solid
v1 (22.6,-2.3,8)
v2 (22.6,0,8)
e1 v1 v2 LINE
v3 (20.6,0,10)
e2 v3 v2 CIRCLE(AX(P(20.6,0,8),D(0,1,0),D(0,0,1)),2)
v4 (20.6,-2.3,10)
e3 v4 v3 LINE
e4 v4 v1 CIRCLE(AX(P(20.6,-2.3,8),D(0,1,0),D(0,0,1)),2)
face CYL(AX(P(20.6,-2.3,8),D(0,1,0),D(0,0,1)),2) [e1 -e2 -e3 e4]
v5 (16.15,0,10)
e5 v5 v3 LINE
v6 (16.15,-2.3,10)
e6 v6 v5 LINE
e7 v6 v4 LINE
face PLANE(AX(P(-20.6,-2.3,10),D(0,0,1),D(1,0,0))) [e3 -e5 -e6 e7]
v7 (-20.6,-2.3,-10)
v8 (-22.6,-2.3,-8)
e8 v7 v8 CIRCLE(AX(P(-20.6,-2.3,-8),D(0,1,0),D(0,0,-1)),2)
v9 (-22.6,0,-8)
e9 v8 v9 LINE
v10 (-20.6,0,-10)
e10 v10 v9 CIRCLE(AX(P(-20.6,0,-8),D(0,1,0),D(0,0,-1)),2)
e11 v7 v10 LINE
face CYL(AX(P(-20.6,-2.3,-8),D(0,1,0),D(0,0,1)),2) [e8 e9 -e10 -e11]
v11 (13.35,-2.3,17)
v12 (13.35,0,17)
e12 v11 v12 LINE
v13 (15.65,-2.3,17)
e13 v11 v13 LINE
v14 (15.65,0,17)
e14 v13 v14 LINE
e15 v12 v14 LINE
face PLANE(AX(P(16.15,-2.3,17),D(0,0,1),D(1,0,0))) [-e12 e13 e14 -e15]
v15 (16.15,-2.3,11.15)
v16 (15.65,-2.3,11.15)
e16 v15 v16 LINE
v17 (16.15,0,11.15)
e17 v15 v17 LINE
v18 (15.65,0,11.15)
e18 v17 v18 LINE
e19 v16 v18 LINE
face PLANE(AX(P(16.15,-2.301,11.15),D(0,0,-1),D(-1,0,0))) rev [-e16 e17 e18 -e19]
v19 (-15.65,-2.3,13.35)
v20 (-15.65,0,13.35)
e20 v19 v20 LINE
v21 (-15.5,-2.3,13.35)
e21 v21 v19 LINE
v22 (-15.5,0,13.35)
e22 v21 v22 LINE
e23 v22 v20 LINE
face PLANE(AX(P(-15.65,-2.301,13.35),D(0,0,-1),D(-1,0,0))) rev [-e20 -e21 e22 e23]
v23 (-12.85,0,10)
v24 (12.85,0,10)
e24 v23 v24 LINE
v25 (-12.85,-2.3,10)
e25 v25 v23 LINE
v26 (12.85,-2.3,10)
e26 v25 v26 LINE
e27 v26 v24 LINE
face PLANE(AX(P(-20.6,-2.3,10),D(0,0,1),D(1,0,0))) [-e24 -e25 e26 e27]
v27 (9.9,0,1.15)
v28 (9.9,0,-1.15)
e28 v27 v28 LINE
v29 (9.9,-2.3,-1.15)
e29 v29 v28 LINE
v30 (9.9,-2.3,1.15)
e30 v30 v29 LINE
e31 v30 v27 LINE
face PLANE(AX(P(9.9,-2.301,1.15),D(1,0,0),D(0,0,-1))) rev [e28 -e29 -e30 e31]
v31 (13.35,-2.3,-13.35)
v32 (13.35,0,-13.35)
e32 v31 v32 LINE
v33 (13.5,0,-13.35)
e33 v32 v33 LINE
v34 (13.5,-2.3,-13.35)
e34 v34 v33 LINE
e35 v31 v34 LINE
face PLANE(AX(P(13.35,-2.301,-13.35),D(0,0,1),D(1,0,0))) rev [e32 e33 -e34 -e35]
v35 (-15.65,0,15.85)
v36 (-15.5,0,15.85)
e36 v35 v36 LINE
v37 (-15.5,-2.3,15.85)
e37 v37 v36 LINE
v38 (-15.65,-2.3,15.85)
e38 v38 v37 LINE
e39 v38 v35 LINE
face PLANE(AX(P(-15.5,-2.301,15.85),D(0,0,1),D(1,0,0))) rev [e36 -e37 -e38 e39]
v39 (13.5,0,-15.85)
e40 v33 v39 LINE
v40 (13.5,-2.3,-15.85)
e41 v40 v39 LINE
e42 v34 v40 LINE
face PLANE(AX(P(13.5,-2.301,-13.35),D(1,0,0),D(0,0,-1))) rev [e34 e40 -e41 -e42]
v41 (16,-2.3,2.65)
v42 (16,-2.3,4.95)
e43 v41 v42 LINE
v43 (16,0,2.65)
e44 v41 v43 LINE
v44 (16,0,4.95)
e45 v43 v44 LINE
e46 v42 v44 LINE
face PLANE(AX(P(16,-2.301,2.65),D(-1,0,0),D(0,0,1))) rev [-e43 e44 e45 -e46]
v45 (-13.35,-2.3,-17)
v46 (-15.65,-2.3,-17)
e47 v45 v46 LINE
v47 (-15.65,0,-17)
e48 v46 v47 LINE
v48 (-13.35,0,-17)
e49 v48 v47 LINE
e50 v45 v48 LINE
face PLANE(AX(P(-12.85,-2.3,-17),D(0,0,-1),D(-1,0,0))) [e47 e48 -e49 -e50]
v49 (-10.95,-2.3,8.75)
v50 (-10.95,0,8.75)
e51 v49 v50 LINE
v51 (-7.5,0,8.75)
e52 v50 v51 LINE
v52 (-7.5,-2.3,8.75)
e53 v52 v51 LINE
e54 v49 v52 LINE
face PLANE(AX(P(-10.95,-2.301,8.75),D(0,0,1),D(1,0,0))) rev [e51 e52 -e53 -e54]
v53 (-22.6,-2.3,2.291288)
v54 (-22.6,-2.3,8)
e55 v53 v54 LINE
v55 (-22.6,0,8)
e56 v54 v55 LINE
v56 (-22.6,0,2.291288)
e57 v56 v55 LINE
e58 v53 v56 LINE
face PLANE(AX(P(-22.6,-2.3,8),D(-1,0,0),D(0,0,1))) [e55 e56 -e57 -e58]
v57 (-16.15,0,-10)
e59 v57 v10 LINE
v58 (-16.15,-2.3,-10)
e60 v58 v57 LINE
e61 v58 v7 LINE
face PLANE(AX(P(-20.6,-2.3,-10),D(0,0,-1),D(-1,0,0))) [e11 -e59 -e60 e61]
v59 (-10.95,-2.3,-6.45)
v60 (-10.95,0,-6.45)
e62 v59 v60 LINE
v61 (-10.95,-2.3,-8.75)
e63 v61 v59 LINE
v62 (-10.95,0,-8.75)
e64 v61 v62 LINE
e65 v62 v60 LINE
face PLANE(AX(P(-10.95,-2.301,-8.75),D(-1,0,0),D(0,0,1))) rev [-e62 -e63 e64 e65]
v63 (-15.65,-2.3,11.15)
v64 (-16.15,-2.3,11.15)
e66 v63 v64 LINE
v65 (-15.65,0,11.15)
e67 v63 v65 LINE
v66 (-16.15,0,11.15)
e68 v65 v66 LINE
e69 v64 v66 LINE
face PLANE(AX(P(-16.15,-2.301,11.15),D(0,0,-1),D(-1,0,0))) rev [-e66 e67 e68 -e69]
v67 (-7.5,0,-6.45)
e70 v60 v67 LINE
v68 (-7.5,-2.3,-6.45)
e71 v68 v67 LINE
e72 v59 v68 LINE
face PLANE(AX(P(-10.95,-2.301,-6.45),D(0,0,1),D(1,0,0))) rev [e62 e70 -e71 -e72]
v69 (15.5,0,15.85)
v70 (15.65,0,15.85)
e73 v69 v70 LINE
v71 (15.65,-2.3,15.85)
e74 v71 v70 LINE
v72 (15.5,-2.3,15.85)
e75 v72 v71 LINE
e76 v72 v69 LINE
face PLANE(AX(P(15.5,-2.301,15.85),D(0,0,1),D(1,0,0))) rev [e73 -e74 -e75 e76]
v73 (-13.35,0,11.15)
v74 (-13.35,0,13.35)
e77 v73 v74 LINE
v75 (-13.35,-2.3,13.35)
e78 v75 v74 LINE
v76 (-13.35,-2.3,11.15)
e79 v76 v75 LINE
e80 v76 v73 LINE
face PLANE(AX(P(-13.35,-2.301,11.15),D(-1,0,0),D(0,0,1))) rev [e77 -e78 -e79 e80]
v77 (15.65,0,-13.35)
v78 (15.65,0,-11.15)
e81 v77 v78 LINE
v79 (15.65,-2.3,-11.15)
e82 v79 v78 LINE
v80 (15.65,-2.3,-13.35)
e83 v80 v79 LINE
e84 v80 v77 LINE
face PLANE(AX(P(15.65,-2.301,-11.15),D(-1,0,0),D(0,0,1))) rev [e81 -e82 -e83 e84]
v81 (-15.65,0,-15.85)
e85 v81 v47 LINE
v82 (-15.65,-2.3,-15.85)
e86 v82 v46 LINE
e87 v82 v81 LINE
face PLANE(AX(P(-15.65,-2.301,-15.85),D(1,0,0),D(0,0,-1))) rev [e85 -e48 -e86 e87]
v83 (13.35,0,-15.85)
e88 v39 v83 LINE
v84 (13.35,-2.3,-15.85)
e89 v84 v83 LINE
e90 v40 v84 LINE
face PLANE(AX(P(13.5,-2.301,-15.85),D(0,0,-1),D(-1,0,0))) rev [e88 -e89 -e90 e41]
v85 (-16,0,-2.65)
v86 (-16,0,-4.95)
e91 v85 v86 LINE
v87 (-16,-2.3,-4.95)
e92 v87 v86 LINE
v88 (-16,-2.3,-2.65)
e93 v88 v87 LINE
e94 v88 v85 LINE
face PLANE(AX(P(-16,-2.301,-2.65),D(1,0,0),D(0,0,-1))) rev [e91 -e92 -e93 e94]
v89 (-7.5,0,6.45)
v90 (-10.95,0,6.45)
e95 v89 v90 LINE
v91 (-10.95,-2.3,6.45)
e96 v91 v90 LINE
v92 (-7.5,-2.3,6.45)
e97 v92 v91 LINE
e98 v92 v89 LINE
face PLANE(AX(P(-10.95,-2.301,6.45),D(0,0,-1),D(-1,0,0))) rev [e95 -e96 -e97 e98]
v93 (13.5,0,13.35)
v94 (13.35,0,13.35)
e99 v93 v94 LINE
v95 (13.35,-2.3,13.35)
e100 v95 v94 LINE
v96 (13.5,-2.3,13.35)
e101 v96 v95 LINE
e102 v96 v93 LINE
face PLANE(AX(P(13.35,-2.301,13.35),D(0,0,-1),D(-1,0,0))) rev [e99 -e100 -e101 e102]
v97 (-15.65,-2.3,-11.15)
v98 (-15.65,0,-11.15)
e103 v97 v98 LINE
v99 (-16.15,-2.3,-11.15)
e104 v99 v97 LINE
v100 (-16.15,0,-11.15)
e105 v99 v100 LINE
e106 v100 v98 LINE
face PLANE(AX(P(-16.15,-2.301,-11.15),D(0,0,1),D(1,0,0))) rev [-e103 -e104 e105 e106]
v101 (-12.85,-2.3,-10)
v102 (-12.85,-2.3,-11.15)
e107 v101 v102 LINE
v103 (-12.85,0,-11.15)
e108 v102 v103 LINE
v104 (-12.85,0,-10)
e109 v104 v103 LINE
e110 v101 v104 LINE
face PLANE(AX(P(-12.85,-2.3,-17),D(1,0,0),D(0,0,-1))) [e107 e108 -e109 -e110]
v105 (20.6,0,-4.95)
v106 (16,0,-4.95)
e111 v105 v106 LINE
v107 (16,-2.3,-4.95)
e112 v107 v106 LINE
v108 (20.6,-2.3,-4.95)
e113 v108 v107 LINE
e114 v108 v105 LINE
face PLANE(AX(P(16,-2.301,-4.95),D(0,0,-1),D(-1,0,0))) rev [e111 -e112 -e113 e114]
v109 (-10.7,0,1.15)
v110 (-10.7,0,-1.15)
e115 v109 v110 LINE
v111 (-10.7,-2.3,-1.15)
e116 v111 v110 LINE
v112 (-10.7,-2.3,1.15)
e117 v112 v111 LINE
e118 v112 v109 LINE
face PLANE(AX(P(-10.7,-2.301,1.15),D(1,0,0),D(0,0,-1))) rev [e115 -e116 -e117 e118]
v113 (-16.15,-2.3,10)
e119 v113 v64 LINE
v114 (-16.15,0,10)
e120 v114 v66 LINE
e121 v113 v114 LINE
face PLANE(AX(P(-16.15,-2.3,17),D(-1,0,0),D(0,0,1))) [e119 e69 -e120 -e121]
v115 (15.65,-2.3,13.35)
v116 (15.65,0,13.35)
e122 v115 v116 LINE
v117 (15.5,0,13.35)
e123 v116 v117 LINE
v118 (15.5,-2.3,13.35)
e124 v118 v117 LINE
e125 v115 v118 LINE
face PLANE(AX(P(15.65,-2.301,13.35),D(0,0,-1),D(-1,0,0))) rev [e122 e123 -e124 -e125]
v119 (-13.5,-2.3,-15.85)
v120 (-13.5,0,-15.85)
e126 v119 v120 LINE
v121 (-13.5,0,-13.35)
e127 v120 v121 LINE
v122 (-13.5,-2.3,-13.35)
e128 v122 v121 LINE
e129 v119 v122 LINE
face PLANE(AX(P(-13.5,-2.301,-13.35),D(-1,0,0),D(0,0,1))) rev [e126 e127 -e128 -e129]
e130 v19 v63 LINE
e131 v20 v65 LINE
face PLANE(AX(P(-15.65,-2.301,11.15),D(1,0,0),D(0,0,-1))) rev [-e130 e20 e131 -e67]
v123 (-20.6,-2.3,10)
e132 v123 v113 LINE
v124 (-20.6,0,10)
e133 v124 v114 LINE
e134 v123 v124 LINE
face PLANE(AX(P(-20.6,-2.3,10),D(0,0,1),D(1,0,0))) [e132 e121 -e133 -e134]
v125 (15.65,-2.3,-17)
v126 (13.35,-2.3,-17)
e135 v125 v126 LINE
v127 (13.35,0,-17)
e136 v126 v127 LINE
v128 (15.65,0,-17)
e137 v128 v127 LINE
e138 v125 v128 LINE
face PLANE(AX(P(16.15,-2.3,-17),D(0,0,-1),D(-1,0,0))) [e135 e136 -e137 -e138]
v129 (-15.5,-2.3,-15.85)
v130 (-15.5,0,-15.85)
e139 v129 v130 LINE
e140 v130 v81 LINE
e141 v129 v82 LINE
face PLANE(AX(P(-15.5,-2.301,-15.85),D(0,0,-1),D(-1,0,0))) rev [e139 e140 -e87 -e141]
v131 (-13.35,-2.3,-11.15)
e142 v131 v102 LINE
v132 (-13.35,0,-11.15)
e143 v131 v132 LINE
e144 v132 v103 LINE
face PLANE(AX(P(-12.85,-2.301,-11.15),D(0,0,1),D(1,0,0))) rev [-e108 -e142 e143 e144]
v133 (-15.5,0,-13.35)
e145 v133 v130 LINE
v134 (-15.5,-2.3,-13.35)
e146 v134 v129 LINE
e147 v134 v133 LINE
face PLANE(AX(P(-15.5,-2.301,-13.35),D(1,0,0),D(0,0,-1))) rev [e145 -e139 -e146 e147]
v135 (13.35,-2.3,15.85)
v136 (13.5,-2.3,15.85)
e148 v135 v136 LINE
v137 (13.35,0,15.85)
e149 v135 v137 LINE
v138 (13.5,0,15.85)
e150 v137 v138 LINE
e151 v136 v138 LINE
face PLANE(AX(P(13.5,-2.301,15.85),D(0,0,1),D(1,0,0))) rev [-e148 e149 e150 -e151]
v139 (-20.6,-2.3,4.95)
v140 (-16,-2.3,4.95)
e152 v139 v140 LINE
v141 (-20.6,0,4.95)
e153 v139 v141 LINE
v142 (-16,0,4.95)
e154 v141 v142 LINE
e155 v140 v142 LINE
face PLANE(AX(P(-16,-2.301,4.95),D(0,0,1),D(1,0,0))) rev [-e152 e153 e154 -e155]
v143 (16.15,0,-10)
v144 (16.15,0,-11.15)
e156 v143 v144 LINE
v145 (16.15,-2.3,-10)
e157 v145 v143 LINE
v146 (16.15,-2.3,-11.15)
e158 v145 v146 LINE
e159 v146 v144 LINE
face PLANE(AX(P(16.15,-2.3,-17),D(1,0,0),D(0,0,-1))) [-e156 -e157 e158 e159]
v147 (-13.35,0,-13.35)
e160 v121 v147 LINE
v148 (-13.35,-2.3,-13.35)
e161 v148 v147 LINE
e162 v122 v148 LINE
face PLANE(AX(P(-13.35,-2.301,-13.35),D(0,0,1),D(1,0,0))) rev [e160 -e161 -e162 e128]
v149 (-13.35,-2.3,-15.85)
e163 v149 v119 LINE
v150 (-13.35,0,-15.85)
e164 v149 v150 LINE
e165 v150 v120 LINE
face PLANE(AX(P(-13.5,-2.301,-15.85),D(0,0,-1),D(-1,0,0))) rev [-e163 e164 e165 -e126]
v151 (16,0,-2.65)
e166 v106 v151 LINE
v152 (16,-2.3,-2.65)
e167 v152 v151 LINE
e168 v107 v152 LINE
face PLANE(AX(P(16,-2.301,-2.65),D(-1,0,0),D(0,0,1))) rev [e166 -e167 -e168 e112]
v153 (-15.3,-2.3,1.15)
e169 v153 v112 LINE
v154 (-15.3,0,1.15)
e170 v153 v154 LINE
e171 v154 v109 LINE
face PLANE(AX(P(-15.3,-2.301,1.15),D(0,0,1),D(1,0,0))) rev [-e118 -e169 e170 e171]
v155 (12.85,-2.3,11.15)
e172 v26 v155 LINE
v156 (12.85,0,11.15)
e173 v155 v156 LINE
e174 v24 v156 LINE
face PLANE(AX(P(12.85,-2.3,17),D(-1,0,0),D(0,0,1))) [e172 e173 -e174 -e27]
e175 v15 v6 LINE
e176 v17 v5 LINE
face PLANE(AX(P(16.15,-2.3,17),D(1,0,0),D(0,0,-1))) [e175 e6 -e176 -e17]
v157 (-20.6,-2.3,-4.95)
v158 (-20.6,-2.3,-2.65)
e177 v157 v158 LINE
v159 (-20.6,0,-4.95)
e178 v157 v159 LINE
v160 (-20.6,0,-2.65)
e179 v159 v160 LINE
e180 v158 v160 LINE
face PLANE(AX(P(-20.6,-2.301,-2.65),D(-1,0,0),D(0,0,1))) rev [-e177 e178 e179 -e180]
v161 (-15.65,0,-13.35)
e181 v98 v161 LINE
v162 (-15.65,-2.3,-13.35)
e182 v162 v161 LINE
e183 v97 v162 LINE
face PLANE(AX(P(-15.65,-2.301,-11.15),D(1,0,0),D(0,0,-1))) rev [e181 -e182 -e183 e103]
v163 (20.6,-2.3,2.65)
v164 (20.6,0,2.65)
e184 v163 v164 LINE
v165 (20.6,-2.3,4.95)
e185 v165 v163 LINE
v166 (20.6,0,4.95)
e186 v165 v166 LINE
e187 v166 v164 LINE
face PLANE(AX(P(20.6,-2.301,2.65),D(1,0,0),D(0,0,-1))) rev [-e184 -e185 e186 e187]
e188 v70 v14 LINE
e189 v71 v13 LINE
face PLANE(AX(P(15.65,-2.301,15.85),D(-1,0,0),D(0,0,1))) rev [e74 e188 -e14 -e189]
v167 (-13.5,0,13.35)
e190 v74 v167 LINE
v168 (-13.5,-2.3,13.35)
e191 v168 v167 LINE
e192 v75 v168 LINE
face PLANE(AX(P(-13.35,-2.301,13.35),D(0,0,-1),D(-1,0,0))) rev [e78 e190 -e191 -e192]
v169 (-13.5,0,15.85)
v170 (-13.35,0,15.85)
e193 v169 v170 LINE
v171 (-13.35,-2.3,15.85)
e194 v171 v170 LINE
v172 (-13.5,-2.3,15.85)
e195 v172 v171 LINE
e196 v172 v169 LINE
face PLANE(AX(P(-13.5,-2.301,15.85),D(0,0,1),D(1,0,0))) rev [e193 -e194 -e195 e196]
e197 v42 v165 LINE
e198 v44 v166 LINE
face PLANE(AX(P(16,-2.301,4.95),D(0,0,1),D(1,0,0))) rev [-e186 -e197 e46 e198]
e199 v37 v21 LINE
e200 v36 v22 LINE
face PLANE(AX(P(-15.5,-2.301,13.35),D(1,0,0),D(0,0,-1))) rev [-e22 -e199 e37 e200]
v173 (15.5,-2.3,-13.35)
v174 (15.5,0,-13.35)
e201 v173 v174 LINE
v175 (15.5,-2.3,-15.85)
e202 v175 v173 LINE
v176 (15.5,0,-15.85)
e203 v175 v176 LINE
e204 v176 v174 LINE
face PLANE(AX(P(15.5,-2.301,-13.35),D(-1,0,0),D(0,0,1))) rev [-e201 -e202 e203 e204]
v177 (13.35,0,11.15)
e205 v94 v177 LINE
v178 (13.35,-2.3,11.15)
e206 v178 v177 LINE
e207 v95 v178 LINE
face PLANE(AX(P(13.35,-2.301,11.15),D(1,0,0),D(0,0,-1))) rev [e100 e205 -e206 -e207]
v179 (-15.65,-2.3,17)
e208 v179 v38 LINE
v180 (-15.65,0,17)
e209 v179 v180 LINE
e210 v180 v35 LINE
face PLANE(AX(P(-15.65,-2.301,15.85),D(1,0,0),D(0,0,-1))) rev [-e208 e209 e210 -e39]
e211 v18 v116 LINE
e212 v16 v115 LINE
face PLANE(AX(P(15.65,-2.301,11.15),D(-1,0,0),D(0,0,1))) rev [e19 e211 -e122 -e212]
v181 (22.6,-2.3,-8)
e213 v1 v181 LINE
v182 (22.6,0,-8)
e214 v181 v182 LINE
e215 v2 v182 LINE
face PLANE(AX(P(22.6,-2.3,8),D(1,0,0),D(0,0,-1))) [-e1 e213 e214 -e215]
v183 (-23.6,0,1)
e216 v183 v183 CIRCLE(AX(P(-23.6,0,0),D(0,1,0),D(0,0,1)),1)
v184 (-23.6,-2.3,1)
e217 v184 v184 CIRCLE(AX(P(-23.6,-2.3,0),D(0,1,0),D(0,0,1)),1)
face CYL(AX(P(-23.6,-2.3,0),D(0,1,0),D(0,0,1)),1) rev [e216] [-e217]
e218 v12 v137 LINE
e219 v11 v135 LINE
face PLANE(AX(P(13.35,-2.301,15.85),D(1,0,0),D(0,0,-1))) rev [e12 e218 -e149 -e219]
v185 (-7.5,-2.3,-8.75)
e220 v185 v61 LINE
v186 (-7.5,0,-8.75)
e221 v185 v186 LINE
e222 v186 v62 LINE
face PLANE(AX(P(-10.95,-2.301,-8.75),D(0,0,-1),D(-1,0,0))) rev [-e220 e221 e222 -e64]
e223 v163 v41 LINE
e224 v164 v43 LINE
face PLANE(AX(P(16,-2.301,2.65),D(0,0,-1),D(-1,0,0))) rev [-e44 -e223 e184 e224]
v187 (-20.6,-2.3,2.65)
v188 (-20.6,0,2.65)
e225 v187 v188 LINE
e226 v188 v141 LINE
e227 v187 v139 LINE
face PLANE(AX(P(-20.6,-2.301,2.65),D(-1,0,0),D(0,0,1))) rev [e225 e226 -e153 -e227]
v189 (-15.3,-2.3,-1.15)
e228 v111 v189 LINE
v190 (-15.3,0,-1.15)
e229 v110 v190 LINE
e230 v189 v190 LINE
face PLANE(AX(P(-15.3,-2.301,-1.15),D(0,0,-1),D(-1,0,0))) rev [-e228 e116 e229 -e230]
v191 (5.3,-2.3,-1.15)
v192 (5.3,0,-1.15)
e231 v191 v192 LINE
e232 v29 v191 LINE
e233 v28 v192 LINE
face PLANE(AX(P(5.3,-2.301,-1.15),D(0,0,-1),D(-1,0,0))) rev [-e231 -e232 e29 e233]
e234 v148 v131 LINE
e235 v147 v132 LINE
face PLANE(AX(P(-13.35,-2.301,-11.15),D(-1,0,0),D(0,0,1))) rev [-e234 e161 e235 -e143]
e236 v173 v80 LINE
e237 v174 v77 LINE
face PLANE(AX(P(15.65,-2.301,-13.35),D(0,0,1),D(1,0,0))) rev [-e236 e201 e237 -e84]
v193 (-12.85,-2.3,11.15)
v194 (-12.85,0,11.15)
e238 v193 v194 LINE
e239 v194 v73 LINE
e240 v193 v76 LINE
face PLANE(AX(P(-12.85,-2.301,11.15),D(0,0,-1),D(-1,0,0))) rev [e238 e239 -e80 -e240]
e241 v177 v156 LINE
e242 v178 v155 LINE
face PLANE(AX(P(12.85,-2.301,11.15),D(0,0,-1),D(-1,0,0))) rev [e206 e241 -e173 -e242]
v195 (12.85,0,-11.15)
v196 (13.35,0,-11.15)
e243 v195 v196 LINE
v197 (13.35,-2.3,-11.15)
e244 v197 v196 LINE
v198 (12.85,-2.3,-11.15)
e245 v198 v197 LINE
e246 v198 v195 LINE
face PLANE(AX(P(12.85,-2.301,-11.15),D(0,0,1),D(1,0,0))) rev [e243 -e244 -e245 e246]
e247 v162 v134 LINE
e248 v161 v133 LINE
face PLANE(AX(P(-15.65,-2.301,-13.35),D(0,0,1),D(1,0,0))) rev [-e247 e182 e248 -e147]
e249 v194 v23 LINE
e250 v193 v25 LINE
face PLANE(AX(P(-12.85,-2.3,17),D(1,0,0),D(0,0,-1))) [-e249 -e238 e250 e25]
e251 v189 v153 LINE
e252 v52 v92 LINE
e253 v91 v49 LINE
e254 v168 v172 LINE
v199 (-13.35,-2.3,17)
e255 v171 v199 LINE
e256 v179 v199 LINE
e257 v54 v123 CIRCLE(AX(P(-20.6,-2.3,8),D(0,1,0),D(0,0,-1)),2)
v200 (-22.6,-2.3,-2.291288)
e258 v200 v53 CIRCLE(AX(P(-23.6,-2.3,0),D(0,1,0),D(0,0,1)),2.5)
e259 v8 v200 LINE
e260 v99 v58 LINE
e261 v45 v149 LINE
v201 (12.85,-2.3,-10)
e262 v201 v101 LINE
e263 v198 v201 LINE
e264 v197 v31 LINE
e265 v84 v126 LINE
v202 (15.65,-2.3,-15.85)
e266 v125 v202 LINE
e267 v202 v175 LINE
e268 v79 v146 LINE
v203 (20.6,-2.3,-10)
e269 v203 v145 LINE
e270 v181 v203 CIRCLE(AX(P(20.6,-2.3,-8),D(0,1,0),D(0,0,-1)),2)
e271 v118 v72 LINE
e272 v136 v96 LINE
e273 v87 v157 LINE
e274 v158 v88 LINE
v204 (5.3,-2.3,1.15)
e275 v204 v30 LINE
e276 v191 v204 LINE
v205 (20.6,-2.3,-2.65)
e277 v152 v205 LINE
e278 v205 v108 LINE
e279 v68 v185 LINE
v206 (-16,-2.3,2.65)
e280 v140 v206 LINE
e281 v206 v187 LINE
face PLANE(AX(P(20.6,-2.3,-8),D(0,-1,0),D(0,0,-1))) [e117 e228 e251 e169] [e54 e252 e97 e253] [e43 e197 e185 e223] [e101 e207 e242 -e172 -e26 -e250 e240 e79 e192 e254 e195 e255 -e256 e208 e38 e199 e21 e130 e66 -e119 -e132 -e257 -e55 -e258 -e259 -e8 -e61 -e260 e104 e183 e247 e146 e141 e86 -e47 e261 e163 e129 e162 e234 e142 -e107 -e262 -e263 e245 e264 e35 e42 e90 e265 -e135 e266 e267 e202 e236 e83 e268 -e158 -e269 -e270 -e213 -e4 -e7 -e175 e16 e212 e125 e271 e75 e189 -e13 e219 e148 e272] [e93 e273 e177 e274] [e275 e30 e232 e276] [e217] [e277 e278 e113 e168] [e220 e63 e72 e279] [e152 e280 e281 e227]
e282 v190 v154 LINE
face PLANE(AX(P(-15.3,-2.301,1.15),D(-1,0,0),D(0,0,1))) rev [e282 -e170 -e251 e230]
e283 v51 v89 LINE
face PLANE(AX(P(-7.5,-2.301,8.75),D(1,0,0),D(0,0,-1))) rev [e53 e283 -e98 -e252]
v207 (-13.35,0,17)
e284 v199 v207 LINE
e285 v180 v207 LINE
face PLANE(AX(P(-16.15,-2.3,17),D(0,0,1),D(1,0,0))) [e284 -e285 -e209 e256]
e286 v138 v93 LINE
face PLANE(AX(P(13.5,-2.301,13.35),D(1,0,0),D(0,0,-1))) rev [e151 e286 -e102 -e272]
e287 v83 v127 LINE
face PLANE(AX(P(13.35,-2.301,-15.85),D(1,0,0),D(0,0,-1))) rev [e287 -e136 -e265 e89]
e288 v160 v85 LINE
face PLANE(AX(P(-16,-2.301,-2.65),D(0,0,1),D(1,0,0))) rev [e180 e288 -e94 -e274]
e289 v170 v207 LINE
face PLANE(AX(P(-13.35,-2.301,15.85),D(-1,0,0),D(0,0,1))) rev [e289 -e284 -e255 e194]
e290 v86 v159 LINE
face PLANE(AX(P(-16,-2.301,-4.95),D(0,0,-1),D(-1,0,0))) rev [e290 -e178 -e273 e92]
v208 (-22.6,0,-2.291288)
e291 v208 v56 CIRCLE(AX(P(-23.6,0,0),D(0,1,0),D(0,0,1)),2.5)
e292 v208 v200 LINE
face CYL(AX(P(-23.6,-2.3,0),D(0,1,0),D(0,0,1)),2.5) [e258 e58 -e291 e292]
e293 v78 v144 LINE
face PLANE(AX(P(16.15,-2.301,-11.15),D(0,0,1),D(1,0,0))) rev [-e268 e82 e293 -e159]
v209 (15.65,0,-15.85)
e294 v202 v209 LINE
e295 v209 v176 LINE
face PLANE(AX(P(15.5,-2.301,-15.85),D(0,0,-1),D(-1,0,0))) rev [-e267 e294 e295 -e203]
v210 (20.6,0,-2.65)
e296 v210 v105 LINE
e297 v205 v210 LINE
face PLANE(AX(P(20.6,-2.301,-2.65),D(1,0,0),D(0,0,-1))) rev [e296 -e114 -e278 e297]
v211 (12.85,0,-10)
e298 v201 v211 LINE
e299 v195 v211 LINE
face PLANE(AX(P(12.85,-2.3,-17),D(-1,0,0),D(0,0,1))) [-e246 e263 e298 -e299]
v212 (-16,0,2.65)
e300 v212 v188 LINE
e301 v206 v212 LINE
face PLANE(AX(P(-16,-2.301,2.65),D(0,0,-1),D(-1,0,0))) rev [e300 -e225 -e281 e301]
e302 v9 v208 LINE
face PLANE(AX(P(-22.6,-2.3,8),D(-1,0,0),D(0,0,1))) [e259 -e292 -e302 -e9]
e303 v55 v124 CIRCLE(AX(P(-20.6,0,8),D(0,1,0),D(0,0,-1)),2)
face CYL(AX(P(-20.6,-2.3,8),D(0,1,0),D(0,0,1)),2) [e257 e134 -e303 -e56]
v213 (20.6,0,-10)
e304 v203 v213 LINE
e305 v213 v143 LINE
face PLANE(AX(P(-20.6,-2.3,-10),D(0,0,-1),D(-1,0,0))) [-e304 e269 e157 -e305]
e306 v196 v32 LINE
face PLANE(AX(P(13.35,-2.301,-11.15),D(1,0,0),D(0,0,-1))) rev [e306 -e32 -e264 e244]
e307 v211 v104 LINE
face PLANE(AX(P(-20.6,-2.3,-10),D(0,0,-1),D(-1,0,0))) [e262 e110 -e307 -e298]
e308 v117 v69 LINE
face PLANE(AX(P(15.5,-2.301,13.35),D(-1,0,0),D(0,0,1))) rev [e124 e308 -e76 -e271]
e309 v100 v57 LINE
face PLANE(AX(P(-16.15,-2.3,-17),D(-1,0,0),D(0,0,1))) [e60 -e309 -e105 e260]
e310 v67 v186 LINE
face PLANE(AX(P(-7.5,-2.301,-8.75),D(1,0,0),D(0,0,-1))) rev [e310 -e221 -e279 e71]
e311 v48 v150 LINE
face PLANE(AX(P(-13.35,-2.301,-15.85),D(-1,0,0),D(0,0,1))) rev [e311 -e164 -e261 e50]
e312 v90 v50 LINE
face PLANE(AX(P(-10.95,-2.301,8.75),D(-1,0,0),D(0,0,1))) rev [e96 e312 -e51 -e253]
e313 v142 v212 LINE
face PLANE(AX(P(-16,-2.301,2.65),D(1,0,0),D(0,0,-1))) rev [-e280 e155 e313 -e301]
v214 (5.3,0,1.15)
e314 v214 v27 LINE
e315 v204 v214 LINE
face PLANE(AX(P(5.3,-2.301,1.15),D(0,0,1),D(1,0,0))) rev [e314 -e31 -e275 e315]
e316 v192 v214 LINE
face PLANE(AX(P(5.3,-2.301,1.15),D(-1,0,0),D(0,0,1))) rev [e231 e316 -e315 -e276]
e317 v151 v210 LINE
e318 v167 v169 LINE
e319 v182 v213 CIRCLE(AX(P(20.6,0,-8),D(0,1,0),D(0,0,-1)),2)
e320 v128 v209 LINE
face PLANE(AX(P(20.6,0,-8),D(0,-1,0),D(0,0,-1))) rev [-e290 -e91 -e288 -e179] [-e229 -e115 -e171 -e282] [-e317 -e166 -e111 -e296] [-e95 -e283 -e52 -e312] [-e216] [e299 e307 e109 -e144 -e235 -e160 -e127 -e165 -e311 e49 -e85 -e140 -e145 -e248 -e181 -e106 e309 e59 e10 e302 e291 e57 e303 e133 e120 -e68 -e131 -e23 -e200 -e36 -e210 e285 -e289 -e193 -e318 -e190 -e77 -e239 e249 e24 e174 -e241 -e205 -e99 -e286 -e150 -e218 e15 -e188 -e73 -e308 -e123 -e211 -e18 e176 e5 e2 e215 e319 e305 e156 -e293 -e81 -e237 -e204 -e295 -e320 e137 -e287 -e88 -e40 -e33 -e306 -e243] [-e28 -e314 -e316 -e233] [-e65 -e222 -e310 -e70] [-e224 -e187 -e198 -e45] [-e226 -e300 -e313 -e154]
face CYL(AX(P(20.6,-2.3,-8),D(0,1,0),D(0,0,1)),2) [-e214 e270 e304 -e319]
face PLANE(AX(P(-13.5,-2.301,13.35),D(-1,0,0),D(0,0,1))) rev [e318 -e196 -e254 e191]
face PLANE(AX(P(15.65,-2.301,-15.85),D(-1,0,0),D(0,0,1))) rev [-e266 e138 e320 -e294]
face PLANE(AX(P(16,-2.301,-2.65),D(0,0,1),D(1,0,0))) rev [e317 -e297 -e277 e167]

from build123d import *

# Parameters (mm, degrees)
BASE_FLANGE1_DEPTH = 2.3
CUT_EXTRUDE2_REACH = 26.82
SKETCH12_W         = 4.6
SKETCH12_H         = 2.3
SKETCH12_W_2       = 3.45
SKETCH6_W          = 3.3
SKETCH6_H          = 7
TAB1_DEPTH         = 2.3
CUT_EXTRUDE1_REACH = 30.373
SKETCH10_R         = 2.5
SKETCH10_R_2       = 1
TAB2_DEPTH         = 2.3


# Sheet-metal steps are written as plain solids
with BuildPart() as part:
    # Sketch1 → Base-Flange1 (new body)
    with BuildSketch(Plane(origin=(0, 0, 0), x_dir=(1, 0, 0), z_dir=(0, 1, 0))):
        with BuildLine():
            Line((-20.6, -10), (20.6, -10))
            ThreePointArc((20.6, -10), (22.014213562, -9.414213562), (22.6, -8))
            Line((22.6, -8), (22.6, 8))
            ThreePointArc((22.6, 8), (22.014213562, 9.414213562), (20.6, 10))
            Line((20.6, 10), (-20.6, 10))
            ThreePointArc((-20.6, 10), (-22.014213562, 9.414213562), (-22.6, 8))
            Line((-22.6, 8), (-22.6, -8))
            ThreePointArc((-22.6, -8), (-22.014213562, -9.414213562), (-20.6, -10))
        make_face()
    extrude(amount=-BASE_FLANGE1_DEPTH)

    # Sketch12 → Cut-Extrude2 (cut, up to next)
    with BuildSketch(Plane(origin=(0, 0, 0), x_dir=(1, 0, 0), z_dir=(0, 1, 0)), mode=Mode.PRIVATE) as cut_extrude2_sk1:
        with Locations((-13, 0)):
            Rectangle(SKETCH12_W, SKETCH12_H)
    cut_extrude2_tool1 = extrude(cut_extrude2_sk1.sketch, amount=-CUT_EXTRUDE2_REACH, mode=Mode.PRIVATE) & part.part
    # Sketch12 → Cut-Extrude2 (cut, up to next)
    with BuildSketch(Plane(origin=(0, 0, 0), x_dir=(1, 0, 0), z_dir=(0, 1, 0)), mode=Mode.PRIVATE) as cut_extrude2_sk2:
        with Locations((7.6, 0)):
            Rectangle(SKETCH12_W, SKETCH12_H)
    cut_extrude2_tool2 = extrude(cut_extrude2_sk2.sketch, amount=-CUT_EXTRUDE2_REACH, mode=Mode.PRIVATE) & part.part
    # Sketch12 → Cut-Extrude2 (cut, up to next)
    with BuildSketch(Plane(origin=(0, 0, 0), x_dir=(1, 0, 0), z_dir=(0, 1, 0)), mode=Mode.PRIVATE) as cut_extrude2_sk3:
        with Locations((-18.3, 3.8)):
            Rectangle(SKETCH12_W, SKETCH12_H)
    cut_extrude2_tool3 = extrude(cut_extrude2_sk3.sketch, amount=-CUT_EXTRUDE2_REACH, mode=Mode.PRIVATE) & part.part
    # Sketch12 → Cut-Extrude2 (cut, up to next)
    with BuildSketch(Plane(origin=(0, 0, 0), x_dir=(1, 0, 0), z_dir=(0, 1, 0)), mode=Mode.PRIVATE) as cut_extrude2_sk4:
        with Locations((18.3, 3.8)):
            Rectangle(SKETCH12_W, SKETCH12_H)
    cut_extrude2_tool4 = extrude(cut_extrude2_sk4.sketch, amount=-CUT_EXTRUDE2_REACH, mode=Mode.PRIVATE) & part.part
    # Sketch12 → Cut-Extrude2 (cut, up to next)
    with BuildSketch(Plane(origin=(0, 0, 0), x_dir=(1, 0, 0), z_dir=(0, 1, 0)), mode=Mode.PRIVATE) as cut_extrude2_sk5:
        with Locations((-18.3, -3.8)):
            Rectangle(SKETCH12_W, SKETCH12_H)
    cut_extrude2_tool5 = extrude(cut_extrude2_sk5.sketch, amount=-CUT_EXTRUDE2_REACH, mode=Mode.PRIVATE) & part.part
    # Sketch12 → Cut-Extrude2 (cut, up to next)
    with BuildSketch(Plane(origin=(0, 0, 0), x_dir=(1, 0, 0), z_dir=(0, 1, 0)), mode=Mode.PRIVATE) as cut_extrude2_sk6:
        with Locations((18.3, -3.8)):
            Rectangle(SKETCH12_W, SKETCH12_H)
    cut_extrude2_tool6 = extrude(cut_extrude2_sk6.sketch, amount=-CUT_EXTRUDE2_REACH, mode=Mode.PRIVATE) & part.part
    # Sketch12 → Cut-Extrude2 (cut, up to next)
    with BuildSketch(Plane(origin=(0, 0, 0), x_dir=(1, 0, 0), z_dir=(0, 1, 0)), mode=Mode.PRIVATE) as cut_extrude2_sk7:
        with Locations((-9.225, 7.6)):
            Rectangle(SKETCH12_W_2, SKETCH12_H)
    cut_extrude2_tool7 = extrude(cut_extrude2_sk7.sketch, amount=-CUT_EXTRUDE2_REACH, mode=Mode.PRIVATE) & part.part
    # Sketch12 → Cut-Extrude2 (cut, up to next)
    with BuildSketch(Plane(origin=(0, 0, 0), x_dir=(1, 0, 0), z_dir=(0, 1, 0)), mode=Mode.PRIVATE) as cut_extrude2_sk8:
        with Locations((-9.225, -7.6)):
            Rectangle(SKETCH12_W_2, SKETCH12_H)
    cut_extrude2_tool8 = extrude(cut_extrude2_sk8.sketch, amount=-CUT_EXTRUDE2_REACH, mode=Mode.PRIVATE) & part.part
    add(cut_extrude2_tool1.solids().sort_by_distance((-13, 0, 0))[0], mode=Mode.SUBTRACT)
    add(cut_extrude2_tool2.solids().sort_by_distance((7.6, 0, 0))[0], mode=Mode.SUBTRACT)
    add(cut_extrude2_tool3.solids().sort_by_distance((-18.3, 0, -3.8))[0], mode=Mode.SUBTRACT)
    add(cut_extrude2_tool4.solids().sort_by_distance((18.3, 0, -3.8))[0], mode=Mode.SUBTRACT)
    add(cut_extrude2_tool5.solids().sort_by_distance((-18.3, 0, 3.8))[0], mode=Mode.SUBTRACT)
    add(cut_extrude2_tool6.solids().sort_by_distance((18.3, 0, 3.8))[0], mode=Mode.SUBTRACT)
    add(cut_extrude2_tool7.solids().sort_by_distance((-9.225, 0, -7.6))[0], mode=Mode.SUBTRACT)
    add(cut_extrude2_tool8.solids().sort_by_distance((-9.225, 0, 7.6))[0], mode=Mode.SUBTRACT)

    # Sketch6 → Tab1 (add)
    with BuildSketch(Plane(origin=(0, 0, 0), x_dir=(1, 0, 0), z_dir=(0, 1, 0))):
        with Locations((-14.5, 13.5)):
            Rectangle(SKETCH6_W, SKETCH6_H)
        with Locations((14.5, 13.5)):
            Rectangle(SKETCH6_W, SKETCH6_H)
        with Locations((14.5, -13.5)):
            Rectangle(SKETCH6_W, SKETCH6_H)
        with Locations((-14.5, -13.5)):
            Rectangle(SKETCH6_W, SKETCH6_H)
    extrude(amount=-TAB1_DEPTH)

    # Sketch9 → Cut-Extrude1 (cut, up to next)
    with BuildSketch(Plane(origin=(0, 0, 0), x_dir=(1, 0, 0), z_dir=(0, 1, 0)), mode=Mode.PRIVATE) as cut_extrude1_sk1:
        Polygon((-12.85, 11.15), (-13.35, 11.15), (-13.35, 13.35), (-13.5, 13.35), (-13.5, 15.85), (-13.35, 15.85), (-13.35, 17), (-12.85, 17), align=None)
    cut_extrude1_tool1 = extrude(cut_extrude1_sk1.sketch, amount=-CUT_EXTRUDE1_REACH, mode=Mode.PRIVATE) & part.part
    # Sketch9 → Cut-Extrude1 (cut, up to next)
    with BuildSketch(Plane(origin=(0, 0, 0), x_dir=(1, 0, 0), z_dir=(0, 1, 0)), mode=Mode.PRIVATE) as cut_extrude1_sk2:
        Polygon((-16.15, 17), (-16.15, 11.15), (-15.65, 11.15), (-15.65, 13.35), (-15.5, 13.35), (-15.5, 15.85), (-15.65, 15.85), (-15.65, 17), align=None)
    cut_extrude1_tool2 = extrude(cut_extrude1_sk2.sketch, amount=-CUT_EXTRUDE1_REACH, mode=Mode.PRIVATE) & part.part
    # Sketch9 → Cut-Extrude1 (cut, up to next)
    with BuildSketch(Plane(origin=(0, 0, 0), x_dir=(1, 0, 0), z_dir=(0, 1, 0)), mode=Mode.PRIVATE) as cut_extrude1_sk3:
        Polygon((-16.15, -11.15), (-15.65, -11.15), (-15.65, -13.35), (-15.5, -13.35), (-15.5, -15.85), (-15.65, -15.85), (-15.65, -17), (-16.15, -17), align=None)
    cut_extrude1_tool3 = extrude(cut_extrude1_sk3.sketch, amount=-CUT_EXTRUDE1_REACH, mode=Mode.PRIVATE) & part.part
    # Sketch9 → Cut-Extrude1 (cut, up to next)
    with BuildSketch(Plane(origin=(0, 0, 0), x_dir=(1, 0, 0), z_dir=(0, 1, 0)), mode=Mode.PRIVATE) as cut_extrude1_sk4:
        Polygon((-12.85, -17), (-12.85, -11.15), (-13.35, -11.15), (-13.35, -13.35), (-13.5, -13.35), (-13.5, -15.85), (-13.35, -15.85), (-13.35, -17), align=None)
    cut_extrude1_tool4 = extrude(cut_extrude1_sk4.sketch, amount=-CUT_EXTRUDE1_REACH, mode=Mode.PRIVATE) & part.part
    # Sketch9 → Cut-Extrude1 (cut, up to next)
    with BuildSketch(Plane(origin=(0, 0, 0), x_dir=(1, 0, 0), z_dir=(0, 1, 0)), mode=Mode.PRIVATE) as cut_extrude1_sk5:
        Polygon((12.85, -11.15), (13.35, -11.15), (13.35, -13.35), (13.5, -13.35), (13.5, -15.85), (13.35, -15.85), (13.35, -17), (12.85, -17), align=None)
    cut_extrude1_tool5 = extrude(cut_extrude1_sk5.sketch, amount=-CUT_EXTRUDE1_REACH, mode=Mode.PRIVATE) & part.part
    # Sketch9 → Cut-Extrude1 (cut, up to next)
    with BuildSketch(Plane(origin=(0, 0, 0), x_dir=(1, 0, 0), z_dir=(0, 1, 0)), mode=Mode.PRIVATE) as cut_extrude1_sk6:
        Polygon((16.15, -17), (16.15, -11.15), (15.65, -11.15), (15.65, -13.35), (15.5, -13.35), (15.5, -15.85), (15.65, -15.85), (15.65, -17), align=None)
    cut_extrude1_tool6 = extrude(cut_extrude1_sk6.sketch, amount=-CUT_EXTRUDE1_REACH, mode=Mode.PRIVATE) & part.part
    # Sketch9 → Cut-Extrude1 (cut, up to next)
    with BuildSketch(Plane(origin=(0, 0, 0), x_dir=(1, 0, 0), z_dir=(0, 1, 0)), mode=Mode.PRIVATE) as cut_extrude1_sk7:
        Polygon((12.85, 17), (12.85, 11.15), (13.35, 11.15), (13.35, 13.35), (13.5, 13.35), (13.5, 15.85), (13.35, 15.85), (13.35, 17), align=None)
    cut_extrude1_tool7 = extrude(cut_extrude1_sk7.sketch, amount=-CUT_EXTRUDE1_REACH, mode=Mode.PRIVATE) & part.part
    # Sketch9 → Cut-Extrude1 (cut, up to next)
    with BuildSketch(Plane(origin=(0, 0, 0), x_dir=(1, 0, 0), z_dir=(0, 1, 0)), mode=Mode.PRIVATE) as cut_extrude1_sk8:
        Polygon((16.15, 11.15), (15.65, 11.15), (15.65, 13.35), (15.5, 13.35), (15.5, 15.85), (15.65, 15.85), (15.65, 17), (16.15, 17), align=None)
    cut_extrude1_tool8 = extrude(cut_extrude1_sk8.sketch, amount=-CUT_EXTRUDE1_REACH, mode=Mode.PRIVATE) & part.part
    add(cut_extrude1_tool1.solids().sort_by_distance((-13.136932, 0, -14.134659))[0], mode=Mode.SUBTRACT)
    add(cut_extrude1_tool2.solids().sort_by_distance((-15.863068, 0, -14.134659))[0], mode=Mode.SUBTRACT)
    add(cut_extrude1_tool3.solids().sort_by_distance((-15.863068, 0, 14.134659))[0], mode=Mode.SUBTRACT)
    add(cut_extrude1_tool4.solids().sort_by_distance((-13.136932, 0, 14.134659))[0], mode=Mode.SUBTRACT)
    add(cut_extrude1_tool5.solids().sort_by_distance((13.136932, 0, 14.134659))[0], mode=Mode.SUBTRACT)
    add(cut_extrude1_tool6.solids().sort_by_distance((15.863068, 0, 14.134659))[0], mode=Mode.SUBTRACT)
    add(cut_extrude1_tool7.solids().sort_by_distance((13.136932, 0, -14.134659))[0], mode=Mode.SUBTRACT)
    add(cut_extrude1_tool8.solids().sort_by_distance((15.863068, 0, -14.134659))[0], mode=Mode.SUBTRACT)

    # Sketch10 → Tab2 (add)
    with BuildSketch(Plane(origin=(0, 0, 0), x_dir=(1, 0, 0), z_dir=(0, 1, 0))):
        with Locations((-23.6, 0)):
            Circle(SKETCH10_R)
        with Locations(Location((-23.6, 0, 0), (0, 0, 270))):
            Circle(SKETCH10_R_2, mode=Mode.SUBTRACT)
    extrude(amount=-TAB2_DEPTH)


solid = part.part
